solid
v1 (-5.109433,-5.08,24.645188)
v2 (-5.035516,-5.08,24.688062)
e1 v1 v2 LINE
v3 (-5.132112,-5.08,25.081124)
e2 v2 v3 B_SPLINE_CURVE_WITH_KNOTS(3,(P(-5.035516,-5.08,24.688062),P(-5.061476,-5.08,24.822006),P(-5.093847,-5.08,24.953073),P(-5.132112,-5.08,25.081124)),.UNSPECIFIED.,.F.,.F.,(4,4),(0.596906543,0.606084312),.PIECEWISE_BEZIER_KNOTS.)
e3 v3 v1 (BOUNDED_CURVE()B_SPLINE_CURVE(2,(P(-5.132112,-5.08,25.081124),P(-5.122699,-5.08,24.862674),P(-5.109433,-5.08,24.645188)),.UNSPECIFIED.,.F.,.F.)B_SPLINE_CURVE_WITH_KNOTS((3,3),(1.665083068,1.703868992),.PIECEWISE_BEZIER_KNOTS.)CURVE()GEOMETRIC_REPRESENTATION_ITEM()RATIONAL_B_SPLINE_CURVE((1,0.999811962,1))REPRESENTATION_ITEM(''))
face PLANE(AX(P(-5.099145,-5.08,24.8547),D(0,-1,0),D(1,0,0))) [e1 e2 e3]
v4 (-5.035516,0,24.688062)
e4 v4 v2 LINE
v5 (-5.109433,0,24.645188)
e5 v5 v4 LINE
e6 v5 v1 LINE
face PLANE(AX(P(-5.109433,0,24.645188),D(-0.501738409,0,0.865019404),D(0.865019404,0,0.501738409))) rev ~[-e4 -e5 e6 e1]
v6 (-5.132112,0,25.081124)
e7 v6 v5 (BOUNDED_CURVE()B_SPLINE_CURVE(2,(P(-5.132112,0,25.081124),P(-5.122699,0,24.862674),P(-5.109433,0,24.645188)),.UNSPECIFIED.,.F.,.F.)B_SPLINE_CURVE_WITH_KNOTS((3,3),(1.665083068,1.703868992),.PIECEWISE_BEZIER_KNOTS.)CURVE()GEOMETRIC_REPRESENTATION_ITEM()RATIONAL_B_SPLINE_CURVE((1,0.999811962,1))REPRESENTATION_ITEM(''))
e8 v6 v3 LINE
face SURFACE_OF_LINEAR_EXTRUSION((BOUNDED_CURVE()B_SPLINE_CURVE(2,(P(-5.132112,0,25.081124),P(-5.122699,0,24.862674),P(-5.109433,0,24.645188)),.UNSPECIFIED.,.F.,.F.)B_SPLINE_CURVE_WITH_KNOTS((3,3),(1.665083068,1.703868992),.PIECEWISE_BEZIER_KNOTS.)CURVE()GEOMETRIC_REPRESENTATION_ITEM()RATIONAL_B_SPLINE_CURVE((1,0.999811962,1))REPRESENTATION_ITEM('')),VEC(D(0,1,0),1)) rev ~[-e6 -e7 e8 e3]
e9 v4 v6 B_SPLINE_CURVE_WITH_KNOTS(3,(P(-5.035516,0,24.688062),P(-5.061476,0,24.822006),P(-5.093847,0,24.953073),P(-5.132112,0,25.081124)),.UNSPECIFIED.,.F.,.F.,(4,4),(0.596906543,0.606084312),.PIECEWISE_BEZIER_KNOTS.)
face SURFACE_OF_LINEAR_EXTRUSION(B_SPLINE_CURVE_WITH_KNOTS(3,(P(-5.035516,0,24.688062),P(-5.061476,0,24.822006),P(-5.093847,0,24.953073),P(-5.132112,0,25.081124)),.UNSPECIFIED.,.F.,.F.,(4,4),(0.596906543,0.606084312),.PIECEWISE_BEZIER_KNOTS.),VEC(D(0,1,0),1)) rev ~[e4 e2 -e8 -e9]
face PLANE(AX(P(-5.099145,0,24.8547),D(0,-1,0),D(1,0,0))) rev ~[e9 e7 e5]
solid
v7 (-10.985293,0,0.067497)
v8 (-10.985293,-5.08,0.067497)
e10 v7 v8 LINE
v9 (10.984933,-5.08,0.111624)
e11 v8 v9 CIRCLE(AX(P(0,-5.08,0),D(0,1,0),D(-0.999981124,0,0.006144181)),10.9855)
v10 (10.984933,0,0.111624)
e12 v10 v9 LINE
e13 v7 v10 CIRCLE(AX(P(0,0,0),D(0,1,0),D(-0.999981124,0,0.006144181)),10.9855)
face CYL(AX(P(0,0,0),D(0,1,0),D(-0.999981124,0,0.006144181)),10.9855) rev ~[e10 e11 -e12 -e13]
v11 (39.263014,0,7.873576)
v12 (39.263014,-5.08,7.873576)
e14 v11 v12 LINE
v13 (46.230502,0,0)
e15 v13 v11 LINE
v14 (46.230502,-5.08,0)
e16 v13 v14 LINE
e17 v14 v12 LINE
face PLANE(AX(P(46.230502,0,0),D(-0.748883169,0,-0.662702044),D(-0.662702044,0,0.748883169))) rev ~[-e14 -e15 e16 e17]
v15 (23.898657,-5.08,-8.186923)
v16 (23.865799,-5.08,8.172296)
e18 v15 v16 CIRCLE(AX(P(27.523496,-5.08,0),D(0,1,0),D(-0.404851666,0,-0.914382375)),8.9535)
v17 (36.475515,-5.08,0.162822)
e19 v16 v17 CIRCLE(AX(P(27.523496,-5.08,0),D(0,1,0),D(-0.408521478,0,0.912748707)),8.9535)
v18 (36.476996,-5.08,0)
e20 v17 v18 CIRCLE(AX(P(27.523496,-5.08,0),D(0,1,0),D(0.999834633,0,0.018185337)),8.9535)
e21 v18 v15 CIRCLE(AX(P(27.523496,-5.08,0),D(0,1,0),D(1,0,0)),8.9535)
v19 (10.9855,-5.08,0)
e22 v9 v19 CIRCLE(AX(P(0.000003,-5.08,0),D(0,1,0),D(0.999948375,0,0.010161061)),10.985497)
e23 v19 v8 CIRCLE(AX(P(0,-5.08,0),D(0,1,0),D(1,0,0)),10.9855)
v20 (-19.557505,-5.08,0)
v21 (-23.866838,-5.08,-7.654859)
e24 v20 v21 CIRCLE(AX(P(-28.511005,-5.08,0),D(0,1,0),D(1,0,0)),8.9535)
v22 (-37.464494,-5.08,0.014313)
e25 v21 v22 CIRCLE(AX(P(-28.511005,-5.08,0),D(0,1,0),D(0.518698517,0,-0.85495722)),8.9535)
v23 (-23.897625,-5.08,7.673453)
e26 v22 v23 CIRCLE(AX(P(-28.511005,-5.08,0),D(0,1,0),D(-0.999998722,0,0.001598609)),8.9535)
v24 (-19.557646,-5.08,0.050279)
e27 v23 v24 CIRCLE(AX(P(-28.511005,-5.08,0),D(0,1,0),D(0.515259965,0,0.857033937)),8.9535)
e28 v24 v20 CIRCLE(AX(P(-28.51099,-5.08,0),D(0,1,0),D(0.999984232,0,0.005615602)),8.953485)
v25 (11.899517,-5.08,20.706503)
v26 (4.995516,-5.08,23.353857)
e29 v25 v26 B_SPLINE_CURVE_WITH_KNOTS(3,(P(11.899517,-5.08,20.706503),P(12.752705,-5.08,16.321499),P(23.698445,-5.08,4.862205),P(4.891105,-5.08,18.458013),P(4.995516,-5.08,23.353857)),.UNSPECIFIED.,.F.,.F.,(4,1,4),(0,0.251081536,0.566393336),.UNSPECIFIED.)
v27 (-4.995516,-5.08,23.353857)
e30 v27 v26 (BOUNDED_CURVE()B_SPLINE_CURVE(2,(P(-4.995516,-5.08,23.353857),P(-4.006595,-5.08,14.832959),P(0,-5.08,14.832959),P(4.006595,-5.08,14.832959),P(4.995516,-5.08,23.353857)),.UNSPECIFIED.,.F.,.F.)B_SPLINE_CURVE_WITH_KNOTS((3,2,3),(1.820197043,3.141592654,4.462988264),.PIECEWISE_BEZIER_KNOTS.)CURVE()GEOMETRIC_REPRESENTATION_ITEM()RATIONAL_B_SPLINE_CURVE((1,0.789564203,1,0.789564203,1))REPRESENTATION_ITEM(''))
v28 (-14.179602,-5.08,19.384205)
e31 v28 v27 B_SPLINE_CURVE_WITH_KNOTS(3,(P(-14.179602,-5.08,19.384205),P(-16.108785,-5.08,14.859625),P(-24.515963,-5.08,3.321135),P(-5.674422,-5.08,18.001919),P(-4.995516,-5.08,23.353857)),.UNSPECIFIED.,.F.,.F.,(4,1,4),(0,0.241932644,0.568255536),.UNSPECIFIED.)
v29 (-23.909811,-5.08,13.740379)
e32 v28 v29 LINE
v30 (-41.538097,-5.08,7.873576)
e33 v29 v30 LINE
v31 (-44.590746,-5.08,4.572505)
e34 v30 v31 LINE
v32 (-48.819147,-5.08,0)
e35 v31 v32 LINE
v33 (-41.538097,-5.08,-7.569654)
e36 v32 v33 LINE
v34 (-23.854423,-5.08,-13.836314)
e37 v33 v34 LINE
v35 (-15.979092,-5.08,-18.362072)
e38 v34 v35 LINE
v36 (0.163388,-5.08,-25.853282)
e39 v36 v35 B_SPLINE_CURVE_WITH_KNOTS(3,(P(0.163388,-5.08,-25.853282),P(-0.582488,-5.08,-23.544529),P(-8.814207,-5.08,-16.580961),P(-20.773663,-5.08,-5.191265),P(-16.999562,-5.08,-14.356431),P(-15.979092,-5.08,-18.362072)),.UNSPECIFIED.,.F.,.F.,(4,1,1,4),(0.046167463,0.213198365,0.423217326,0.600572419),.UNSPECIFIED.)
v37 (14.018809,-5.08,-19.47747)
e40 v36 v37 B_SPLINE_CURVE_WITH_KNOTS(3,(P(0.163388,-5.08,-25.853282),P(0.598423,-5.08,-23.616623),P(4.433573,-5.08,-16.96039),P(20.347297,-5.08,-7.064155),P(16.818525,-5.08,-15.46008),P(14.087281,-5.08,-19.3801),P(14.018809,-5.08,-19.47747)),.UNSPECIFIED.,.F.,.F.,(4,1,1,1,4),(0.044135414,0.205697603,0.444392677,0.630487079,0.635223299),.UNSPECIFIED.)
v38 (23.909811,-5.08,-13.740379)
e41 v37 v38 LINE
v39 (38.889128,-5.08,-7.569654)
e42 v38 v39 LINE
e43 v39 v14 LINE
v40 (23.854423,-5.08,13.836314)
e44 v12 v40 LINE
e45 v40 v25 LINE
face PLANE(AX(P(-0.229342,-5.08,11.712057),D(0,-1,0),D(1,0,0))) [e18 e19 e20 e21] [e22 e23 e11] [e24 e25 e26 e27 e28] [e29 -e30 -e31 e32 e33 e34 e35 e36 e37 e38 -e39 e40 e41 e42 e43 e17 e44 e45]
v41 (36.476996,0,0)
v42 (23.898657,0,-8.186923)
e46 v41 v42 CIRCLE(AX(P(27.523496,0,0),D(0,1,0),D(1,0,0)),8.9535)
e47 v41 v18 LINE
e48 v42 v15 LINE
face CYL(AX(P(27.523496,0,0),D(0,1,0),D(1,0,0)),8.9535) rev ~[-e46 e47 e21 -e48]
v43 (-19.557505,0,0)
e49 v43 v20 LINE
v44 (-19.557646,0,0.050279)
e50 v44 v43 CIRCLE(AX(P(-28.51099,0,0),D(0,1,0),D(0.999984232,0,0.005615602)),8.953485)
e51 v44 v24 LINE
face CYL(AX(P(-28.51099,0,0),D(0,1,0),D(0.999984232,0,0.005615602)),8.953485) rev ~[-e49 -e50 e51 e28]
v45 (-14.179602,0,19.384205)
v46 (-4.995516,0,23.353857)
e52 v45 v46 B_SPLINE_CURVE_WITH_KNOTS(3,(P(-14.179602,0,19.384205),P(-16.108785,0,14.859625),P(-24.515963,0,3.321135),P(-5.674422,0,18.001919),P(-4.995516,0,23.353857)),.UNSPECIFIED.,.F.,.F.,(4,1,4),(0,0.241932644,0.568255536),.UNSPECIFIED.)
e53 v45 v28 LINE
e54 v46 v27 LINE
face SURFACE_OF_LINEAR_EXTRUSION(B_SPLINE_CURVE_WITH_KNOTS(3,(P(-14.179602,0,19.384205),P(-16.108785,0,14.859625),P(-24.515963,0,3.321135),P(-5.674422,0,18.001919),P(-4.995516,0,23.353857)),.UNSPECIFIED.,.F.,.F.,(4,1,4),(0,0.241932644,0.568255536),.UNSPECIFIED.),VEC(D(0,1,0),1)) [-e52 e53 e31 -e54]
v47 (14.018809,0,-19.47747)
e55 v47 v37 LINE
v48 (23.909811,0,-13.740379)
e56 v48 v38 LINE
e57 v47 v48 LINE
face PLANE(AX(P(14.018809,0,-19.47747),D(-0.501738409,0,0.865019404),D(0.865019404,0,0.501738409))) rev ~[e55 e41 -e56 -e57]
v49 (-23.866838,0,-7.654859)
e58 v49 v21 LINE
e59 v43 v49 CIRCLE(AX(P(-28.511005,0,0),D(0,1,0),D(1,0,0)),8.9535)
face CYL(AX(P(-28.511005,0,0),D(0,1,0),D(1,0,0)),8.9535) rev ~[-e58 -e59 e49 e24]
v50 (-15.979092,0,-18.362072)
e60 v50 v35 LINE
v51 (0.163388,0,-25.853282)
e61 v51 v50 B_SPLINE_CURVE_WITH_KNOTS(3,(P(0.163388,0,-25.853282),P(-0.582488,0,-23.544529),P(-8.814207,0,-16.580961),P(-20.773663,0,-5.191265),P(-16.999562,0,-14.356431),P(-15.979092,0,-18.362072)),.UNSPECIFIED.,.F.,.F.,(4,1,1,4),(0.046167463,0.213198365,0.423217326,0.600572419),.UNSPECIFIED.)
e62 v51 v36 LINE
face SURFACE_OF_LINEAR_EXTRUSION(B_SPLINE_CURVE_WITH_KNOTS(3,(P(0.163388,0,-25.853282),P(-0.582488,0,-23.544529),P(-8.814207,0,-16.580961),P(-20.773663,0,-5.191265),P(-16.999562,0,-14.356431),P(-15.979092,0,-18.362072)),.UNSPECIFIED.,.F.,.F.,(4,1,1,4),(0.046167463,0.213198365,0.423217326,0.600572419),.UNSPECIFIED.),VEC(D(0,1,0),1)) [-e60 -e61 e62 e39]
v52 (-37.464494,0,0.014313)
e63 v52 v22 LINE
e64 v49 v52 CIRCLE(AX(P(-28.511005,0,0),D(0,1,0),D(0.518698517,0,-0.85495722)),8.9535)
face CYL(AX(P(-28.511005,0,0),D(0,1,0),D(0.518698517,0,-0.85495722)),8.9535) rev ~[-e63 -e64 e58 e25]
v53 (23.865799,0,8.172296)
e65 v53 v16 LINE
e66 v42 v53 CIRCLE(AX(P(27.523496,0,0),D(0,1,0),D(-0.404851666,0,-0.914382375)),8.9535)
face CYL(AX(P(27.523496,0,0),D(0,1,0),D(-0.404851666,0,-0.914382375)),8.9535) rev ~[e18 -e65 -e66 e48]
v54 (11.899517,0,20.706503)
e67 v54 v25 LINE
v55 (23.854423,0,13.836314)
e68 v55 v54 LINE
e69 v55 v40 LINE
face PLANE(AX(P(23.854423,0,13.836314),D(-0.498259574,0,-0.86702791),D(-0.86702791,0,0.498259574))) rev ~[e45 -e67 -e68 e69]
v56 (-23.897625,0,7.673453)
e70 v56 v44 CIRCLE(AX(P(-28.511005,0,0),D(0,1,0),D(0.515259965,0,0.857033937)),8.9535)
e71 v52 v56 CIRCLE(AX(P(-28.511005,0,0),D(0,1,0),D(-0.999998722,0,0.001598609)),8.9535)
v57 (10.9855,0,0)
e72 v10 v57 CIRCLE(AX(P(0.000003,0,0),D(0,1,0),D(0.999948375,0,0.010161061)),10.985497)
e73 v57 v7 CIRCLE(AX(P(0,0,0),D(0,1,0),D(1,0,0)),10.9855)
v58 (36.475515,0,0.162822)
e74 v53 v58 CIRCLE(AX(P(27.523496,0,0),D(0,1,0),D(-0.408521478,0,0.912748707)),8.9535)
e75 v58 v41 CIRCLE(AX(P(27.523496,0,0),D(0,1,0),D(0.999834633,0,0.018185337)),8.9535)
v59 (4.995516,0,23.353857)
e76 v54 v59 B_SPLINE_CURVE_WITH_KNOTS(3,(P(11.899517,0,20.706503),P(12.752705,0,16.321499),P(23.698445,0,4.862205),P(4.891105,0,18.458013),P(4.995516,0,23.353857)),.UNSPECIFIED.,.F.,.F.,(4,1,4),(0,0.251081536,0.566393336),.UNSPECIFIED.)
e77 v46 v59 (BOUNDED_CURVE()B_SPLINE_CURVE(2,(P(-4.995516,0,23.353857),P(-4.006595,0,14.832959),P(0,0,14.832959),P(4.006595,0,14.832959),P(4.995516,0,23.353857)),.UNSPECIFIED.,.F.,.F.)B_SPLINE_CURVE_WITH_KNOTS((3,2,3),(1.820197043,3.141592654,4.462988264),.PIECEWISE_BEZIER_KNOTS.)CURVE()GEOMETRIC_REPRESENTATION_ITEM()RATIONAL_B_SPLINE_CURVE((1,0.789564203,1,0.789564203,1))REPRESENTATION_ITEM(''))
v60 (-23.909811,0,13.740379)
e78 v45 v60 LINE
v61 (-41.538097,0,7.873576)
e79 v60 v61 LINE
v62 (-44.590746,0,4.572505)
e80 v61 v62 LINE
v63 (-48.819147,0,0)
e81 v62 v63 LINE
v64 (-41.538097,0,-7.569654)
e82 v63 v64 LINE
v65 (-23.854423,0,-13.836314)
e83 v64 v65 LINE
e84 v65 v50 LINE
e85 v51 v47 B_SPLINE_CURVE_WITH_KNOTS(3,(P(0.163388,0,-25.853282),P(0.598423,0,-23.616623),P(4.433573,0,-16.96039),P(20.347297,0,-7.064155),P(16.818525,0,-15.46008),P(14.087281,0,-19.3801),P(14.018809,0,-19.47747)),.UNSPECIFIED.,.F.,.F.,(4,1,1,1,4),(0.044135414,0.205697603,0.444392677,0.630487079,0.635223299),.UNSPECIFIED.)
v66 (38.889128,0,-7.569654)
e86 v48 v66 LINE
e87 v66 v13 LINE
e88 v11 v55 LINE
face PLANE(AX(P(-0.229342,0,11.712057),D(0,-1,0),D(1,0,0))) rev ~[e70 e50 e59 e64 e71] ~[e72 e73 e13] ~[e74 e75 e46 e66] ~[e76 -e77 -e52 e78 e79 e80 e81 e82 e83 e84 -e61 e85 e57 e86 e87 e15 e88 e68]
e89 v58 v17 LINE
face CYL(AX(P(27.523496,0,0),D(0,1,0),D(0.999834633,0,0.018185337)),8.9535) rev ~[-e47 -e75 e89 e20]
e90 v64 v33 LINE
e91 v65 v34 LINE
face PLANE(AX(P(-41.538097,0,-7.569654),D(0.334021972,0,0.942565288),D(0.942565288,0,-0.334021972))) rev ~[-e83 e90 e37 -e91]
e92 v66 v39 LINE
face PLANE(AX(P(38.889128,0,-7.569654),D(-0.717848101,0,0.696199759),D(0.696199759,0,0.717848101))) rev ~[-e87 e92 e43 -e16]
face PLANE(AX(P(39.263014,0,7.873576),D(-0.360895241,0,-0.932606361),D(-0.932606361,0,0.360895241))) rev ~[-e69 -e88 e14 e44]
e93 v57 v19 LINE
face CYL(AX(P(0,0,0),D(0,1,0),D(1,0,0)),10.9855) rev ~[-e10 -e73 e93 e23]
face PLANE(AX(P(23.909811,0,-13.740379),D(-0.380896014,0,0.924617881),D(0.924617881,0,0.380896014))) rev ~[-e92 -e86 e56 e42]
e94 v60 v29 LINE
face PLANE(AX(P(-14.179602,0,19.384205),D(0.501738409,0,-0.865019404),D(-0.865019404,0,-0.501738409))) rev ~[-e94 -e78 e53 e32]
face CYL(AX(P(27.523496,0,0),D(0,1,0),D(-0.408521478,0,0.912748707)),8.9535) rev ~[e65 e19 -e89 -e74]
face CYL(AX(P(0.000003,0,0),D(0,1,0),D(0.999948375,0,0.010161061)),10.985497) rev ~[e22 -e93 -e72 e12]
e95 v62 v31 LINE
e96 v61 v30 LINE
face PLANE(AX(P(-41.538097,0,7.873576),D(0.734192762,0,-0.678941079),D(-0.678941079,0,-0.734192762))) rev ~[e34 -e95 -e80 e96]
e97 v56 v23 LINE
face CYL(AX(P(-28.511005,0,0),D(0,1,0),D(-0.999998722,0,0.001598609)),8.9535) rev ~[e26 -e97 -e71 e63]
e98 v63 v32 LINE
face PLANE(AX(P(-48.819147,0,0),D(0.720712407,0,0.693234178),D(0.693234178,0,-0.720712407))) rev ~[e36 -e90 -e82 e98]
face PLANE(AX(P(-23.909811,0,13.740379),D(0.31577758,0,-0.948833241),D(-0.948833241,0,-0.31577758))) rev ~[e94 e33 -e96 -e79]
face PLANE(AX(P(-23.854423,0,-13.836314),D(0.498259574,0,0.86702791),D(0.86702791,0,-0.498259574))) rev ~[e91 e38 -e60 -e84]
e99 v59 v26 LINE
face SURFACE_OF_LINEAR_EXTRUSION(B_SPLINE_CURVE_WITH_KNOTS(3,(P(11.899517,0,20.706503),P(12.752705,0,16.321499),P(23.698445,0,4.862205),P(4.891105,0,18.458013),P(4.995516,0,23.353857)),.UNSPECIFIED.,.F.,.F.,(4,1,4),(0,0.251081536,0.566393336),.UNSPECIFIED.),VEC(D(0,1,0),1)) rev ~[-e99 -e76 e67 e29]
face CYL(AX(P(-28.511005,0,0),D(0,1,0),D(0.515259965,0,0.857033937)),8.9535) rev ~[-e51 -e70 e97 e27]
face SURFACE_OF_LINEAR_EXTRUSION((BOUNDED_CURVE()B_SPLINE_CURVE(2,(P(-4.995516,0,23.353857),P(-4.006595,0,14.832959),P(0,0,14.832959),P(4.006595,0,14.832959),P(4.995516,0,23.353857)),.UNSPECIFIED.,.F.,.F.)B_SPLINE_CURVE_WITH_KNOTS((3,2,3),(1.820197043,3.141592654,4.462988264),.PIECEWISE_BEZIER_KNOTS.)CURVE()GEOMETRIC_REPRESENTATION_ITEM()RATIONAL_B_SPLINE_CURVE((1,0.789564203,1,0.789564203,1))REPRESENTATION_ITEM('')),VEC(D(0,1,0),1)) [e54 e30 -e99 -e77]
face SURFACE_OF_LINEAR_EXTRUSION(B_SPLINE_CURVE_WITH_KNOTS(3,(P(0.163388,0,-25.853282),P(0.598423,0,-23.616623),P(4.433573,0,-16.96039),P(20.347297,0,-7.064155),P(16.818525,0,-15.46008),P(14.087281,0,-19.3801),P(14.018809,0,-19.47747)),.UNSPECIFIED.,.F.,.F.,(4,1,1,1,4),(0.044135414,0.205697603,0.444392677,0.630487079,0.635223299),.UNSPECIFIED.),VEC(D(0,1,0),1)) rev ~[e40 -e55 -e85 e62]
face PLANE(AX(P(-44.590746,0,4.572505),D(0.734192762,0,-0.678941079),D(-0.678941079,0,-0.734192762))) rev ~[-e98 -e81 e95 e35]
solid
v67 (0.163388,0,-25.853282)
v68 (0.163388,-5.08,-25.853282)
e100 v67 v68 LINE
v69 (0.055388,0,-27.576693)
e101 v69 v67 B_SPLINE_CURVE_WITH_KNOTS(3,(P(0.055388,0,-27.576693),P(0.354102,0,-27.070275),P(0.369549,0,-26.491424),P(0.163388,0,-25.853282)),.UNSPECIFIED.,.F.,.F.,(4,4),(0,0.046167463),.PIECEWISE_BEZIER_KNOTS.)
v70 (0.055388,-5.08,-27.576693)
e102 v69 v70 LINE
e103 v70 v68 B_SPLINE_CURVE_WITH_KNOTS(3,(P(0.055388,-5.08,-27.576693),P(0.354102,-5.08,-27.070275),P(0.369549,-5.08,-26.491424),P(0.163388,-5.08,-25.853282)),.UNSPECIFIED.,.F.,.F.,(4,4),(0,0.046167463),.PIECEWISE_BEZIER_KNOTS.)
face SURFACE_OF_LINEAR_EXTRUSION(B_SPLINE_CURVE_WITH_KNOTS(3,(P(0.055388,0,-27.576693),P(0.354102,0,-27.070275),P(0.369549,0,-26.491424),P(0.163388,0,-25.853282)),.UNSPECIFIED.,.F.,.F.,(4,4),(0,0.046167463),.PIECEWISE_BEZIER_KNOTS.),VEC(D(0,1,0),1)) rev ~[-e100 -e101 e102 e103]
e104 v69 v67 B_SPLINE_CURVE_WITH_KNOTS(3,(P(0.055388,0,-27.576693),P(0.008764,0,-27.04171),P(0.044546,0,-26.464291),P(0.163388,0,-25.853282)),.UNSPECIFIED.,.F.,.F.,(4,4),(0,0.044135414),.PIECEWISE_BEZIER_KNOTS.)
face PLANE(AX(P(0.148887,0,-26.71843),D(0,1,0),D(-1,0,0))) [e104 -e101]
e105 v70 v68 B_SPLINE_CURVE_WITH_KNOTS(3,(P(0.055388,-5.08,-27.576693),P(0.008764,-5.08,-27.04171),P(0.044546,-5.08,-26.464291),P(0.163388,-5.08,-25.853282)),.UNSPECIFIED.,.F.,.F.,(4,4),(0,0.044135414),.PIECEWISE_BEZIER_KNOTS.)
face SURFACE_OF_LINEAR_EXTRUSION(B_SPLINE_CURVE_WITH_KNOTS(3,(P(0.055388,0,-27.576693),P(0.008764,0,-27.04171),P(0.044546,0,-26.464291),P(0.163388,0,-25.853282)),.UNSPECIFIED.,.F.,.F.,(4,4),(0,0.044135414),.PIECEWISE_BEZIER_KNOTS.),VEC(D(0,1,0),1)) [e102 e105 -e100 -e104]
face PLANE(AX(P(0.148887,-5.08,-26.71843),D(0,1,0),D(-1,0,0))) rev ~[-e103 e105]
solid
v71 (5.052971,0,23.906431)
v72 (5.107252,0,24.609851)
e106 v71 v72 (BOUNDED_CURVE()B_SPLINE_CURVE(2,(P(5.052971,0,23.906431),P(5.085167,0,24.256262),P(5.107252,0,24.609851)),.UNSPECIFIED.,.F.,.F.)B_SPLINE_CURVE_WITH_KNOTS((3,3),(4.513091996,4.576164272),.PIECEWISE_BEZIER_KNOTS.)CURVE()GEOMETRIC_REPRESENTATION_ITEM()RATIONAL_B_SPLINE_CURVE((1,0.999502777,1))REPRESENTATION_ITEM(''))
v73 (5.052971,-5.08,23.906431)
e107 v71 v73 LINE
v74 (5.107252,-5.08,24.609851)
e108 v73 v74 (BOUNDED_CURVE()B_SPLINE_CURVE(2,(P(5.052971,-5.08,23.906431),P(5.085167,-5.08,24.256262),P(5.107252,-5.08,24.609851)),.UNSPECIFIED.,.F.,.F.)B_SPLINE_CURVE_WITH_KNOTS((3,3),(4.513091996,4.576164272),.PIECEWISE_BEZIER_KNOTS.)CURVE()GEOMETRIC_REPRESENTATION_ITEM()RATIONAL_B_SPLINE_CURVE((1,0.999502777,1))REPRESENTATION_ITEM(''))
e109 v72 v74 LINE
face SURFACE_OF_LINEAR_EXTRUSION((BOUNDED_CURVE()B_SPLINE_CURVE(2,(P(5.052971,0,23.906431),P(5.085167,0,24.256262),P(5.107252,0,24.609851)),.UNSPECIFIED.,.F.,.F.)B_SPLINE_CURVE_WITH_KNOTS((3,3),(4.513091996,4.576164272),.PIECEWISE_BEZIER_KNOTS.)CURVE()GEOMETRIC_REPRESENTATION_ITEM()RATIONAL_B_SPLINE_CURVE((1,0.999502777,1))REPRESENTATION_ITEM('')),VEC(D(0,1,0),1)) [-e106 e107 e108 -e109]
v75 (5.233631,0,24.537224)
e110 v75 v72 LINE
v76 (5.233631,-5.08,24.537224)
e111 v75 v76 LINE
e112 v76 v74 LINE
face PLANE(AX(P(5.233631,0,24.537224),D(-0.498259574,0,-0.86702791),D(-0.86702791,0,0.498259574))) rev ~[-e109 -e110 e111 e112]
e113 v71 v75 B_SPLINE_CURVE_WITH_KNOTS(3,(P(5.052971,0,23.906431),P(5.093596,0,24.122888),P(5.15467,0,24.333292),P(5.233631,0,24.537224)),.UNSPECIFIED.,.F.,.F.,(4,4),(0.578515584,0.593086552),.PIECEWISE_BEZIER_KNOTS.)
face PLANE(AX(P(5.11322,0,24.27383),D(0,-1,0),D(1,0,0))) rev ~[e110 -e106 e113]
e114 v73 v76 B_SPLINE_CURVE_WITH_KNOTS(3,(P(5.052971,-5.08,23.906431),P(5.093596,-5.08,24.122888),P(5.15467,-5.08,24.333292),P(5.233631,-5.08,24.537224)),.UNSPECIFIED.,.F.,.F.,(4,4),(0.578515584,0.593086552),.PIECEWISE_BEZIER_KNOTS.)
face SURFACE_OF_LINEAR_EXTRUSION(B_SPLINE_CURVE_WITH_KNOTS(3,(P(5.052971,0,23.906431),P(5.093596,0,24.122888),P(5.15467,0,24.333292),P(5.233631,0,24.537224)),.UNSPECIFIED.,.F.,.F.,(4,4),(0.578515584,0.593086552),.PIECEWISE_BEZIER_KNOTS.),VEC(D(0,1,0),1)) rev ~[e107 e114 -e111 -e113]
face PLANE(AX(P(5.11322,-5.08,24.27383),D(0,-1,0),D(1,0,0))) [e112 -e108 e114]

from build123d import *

# Parameters (mm, degrees)
F1_DEPTH = 5.08


with BuildPart() as f1:
    # F0 (on Front) → F1 (new body)
    with BuildSketch(Plane.XZ):
        with BuildLine():
            Line((23.8544226128, 13.8363139495), (11.8995172721, 20.7065034498))
            add(Edge.make_bspline(
                [(11.8995172721, 20.7065034498), (12.7527047238, 16.3214990301), (23.6984449015, 4.8622046649), (4.8911049153, 18.4580126576), (4.9955159434, 23.3538565741)],
                knots=[0, 0, 0, 0, 0.2510815361, 0.566393336, 0.566393336, 0.566393336, 0.566393336], degree=3))
            add(Edge.make_bspline(
                [(-4.9955159434, 23.3538565741), (-4.0065950779, 14.8329585791), (0, 14.8329585791), (4.0065950779, 14.8329585791), (4.9955159434, 23.3538565741)],
                knots=[1.8201970434, 1.8201970434, 1.8201970434, 3.1415926536, 3.1415926536, 4.4629882638, 4.4629882638, 4.4629882638], degree=2, weights=[1, 0.7895642031, 1, 0.7895642031, 1]))
            add(Edge.make_bspline(
                [(-14.1796024948, 19.3842051979), (-16.1087852311, 14.8596253569), (-24.5159632533, 3.3211353455), (-5.6744217692, 18.0019188802), (-4.9955159434, 23.3538565741)],
                knots=[0, 0, 0, 0, 0.2419326445, 0.5682555357, 0.5682555357, 0.5682555357, 0.5682555357], degree=3))
            Line((-14.1796024948, 19.3842051979), (-23.9098106814, 13.7403790006))
            Line((-23.9098106814, 13.7403790006), (-23.8976251995, 7.6734533511))
            ThreePointArc((-23.8976251995, 7.6734533511), (-20.730112215, 4.4297703221), (-19.5576464714, 0.0502792352))
            Line((-19.5576464714, 0.0502792352), (-10.9852926415, 0.0674968952))
            ThreePointArc((-10.9852926415, 0.0674968952), (-0.0220644441, 10.9854778417), (10.9849328747, 0.1116243169))
            Line((10.9849328747, 0.1116243169), (18.5708946822, 0.1268607984))
            ThreePointArc((18.5708946822, 0.1268607984), (20.0443809343, 4.922194791), (23.8657988515, 8.1722955491))
            Line((23.8657988515, 8.1722955491), (23.8544226128, 13.8363139495))
        make_face()
        with BuildLine():
            Line((39.2630137504, 7.8735761344), (23.8544226128, 13.8363139495))
            Line((23.8544226128, 13.8363139495), (23.8657988515, 8.1722955491))
            ThreePointArc((23.8657988515, 8.1722955491), (32.3240559978, 7.557763228), (36.4755152887, 0.1628224112))
            Line((36.4755152887, 0.1628224112), (41.5712800692, 0.1730573066))
            Line((41.5712800692, 0.1730573066), (41.5622201778, 4.6838093397))
            Line((41.5622201778, 4.6838093397), (39.2630137504, 7.8735761344))
        make_face()
        Polygon((46.2305024266, 0), (39.2630137504, 7.8735761344), (41.5622201778, 4.6838093397), (41.5712800692, 0.1730573066), (41.5716276565, 0), (38.8891281875, -7.569654379), align=None)
        with BuildLine():
            Line((41.5712800692, 0.1730573066), (36.4755152887, 0.1628224112))
            ThreePointArc((36.4755152887, 0.1628224112), (36.4766257405, 0.0814145715), (36.4769959013, 0))
            ThreePointArc((36.4769959013, 0), (32.4076622958, -7.504004323), (23.8986565077, -8.1869225977))
            Line((23.8986565077, -8.1869225977), (23.9098106814, -13.7403790006))
            Line((23.9098106814, -13.7403790006), (38.8891281875, -7.569654379))
            Line((38.8891281875, -7.569654379), (41.5716276565, 0))
            Line((41.5716276565, 0), (41.5712800692, 0.1730573066))
        make_face()
        with BuildLine():
            ThreePointArc((23.8986565077, -8.1869225977), (19.9850775207, -4.830880931), (18.5708946822, 0.1268607984))
            Line((18.5708946822, 0.1268607984), (10.9849328747, 0.1116243169))
            ThreePointArc((10.9849328747, 0.1116243169), (10.9853582178, 0.0558128788), (10.9855, 0))
            ThreePointArc((10.9855, 0), (-0.0337486069, -10.9854481602), (-10.9852926415, 0.0674968952))
            Line((-10.9852926415, 0.0674968952), (-19.5576464714, 0.0502792352))
            ThreePointArc((-19.5576464714, 0.0502792352), (-19.5575405901, 0.0251397167), (-19.5575052963, 0))
            ThreePointArc((-19.5575052963, 0), (-20.7088673521, -4.3922438172), (-23.8668381271, -7.6548594732))
            Line((-23.8668381271, -7.6548594732), (-23.8544226128, -13.8363139495))
            Line((-23.8544226128, -13.8363139495), (-15.9790920253, -18.3620723701))
            add(Edge.make_bspline(
                [(0.163388369, -25.8532824823), (-0.5824883081, -23.5445287745), (-8.8142073886, -16.5809605771), (-20.7736627649, -5.1912645148), (-16.9995624931, -14.3564310957), (-15.9790920253, -18.3620723701)],
                knots=[0.0461674631, 0.0461674631, 0.0461674631, 0.0461674631, 0.2131983653, 0.4232173263, 0.6005724186, 0.6005724186, 0.6005724186, 0.6005724186], degree=3))
            add(Edge.make_bspline(
                [(0.163388369, -25.8532824823), (0.5984234349, -23.6166229337), (4.4335734026, -16.9603900208), (20.3472971341, -7.0641553228), (16.8185248338, -15.4600803358), (14.0872810007, -19.3800999399), (14.0188094193, -19.4774702293)],
                knots=[0.0441354144, 0.0441354144, 0.0441354144, 0.0441354144, 0.2056976035, 0.4443926766, 0.6304870786, 0.6352232986, 0.6352232986, 0.6352232986, 0.6352232986], degree=3))
            Line((14.0188094193, -19.4774702293), (23.9098106814, -13.7403790006))
            Line((23.9098106814, -13.7403790006), (23.8986565077, -8.1869225977))
        make_face()
        with BuildLine():
            Line((-23.8976251995, 7.6734533511), (-23.9098106814, 13.7403790006))
            Line((-23.9098106814, 13.7403790006), (-41.5380969644, 7.8735761344))
            Line((-41.5380969644, 7.8735761344), (-44.5907459629, 4.5725049953))
            Line((-44.5907459629, 4.5725049953), (-44.5907459629, 0))
            Line((-44.5907459629, 0), (-37.4644938557, 0.0143131499))
            ThreePointArc((-37.4644938557, 0.0143131499), (-32.9126802641, 7.7968211297), (-23.8976251995, 7.6734533511))
        make_face()
        with BuildLine():
            ThreePointArc((-23.8668381271, -7.6548594732), (-32.9094839983, -7.7986247094), (-37.4644938557, 0.0143131499))
            Line((-37.4644938557, 0.0143131499), (-44.5907459629, 0))
            Line((-44.5907459629, 0), (-44.5907459629, -2.3883581161))
            Line((-44.5907459629, -2.3883581161), (-41.5380969644, -7.569654379))
            Line((-41.5380969644, -7.569654379), (-23.8544226128, -13.8363139495))
            Line((-23.8544226128, -13.8363139495), (-23.8668381271, -7.6548594732))
        make_face()
        Polygon((-44.5907459629, 0), (-44.5907459629, 4.5725049953), (-48.8191470504, 0), (-41.5380969644, -7.569654379), (-44.5907459629, -2.3883581161), align=None)
    extrude(amount=F1_DEPTH)


with BuildPart() as f1b:
    # F0 (on Front) → F1, piece 2 (new body)
    with BuildSketch(Plane.XZ):
        with BuildLine():
            add(Edge.make_bspline(
                [(5.05297105, 23.9064308163), (5.0935955947, 24.1228884346), (5.1546696758, 24.333291686), (5.2336305106, 24.5372243074)],
                knots=[0.5785155836, 0.5785155836, 0.5785155836, 0.5785155836, 0.5930865518, 0.5930865518, 0.5930865518, 0.5930865518], degree=3))
            Line((5.2336305106, 24.5372243074), (5.1072520142, 24.609850915))
            add(Edge.make_bspline(
                [(5.05297105, 23.9064308163), (5.085167197, 24.2562618556), (5.1072520142, 24.609850915)],
                knots=[4.5130919957, 4.5130919957, 4.5130919957, 4.5761642718, 4.5761642718, 4.5761642718], degree=2, weights=[1, 0.9995027772, 1]))
        make_face()
    extrude(amount=F1_DEPTH)


with BuildPart() as f1c:
    # F0 (on Front) → F1, piece 3 (new body)
    with BuildSketch(Plane.XZ):
        with BuildLine():
            add(Edge.make_bspline(
                [(-5.1321122684, 25.0811244519), (-5.1226991178, 24.8626735882), (-5.1094332892, 24.6451880664)],
                knots=[1.6650830677, 1.6650830677, 1.6650830677, 1.7038689923, 1.7038689923, 1.7038689923], degree=2, weights=[1, 0.9998119624, 1]))
            Line((-5.1094332892, 24.6451880664), (-5.0355162164, 24.688062289))
            add(Edge.make_bspline(
                [(-5.0355162164, 24.688062289), (-5.0614762451, 24.822005601), (-5.0938469313, 24.9530733475), (-5.1321122684, 25.0811244519)],
                knots=[0.596906543, 0.596906543, 0.596906543, 0.596906543, 0.6060843122, 0.6060843122, 0.6060843122, 0.6060843122], degree=3))
        make_face()
    extrude(amount=F1_DEPTH)


with BuildPart() as f1d:
    # F0 (on Front) → F1, piece 4 (new body)
    with BuildSketch(Plane.XZ):
        with BuildLine():
            add(Edge.make_bspline(
                [(0.0553880686, -27.5766929501), (0.0087635928, -27.0417101596), (0.0445458786, -26.464291138), (0.163388369, -25.8532824823)],
                knots=[0, 0, 0, 0, 0.0441354144, 0.0441354144, 0.0441354144, 0.0441354144], degree=3))
            add(Edge.make_bspline(
                [(0.0553880686, -27.5766929501), (0.3541021804, -27.0702754536), (0.3695492259, -26.4914236891), (0.163388369, -25.8532824823)],
                knots=[0, 0, 0, 0, 0.0461674631, 0.0461674631, 0.0461674631, 0.0461674631], degree=3))
        make_face()
    extrude(amount=F1_DEPTH)


solid = Compound([f1.part, f1b.part, f1c.part, f1d.part])
